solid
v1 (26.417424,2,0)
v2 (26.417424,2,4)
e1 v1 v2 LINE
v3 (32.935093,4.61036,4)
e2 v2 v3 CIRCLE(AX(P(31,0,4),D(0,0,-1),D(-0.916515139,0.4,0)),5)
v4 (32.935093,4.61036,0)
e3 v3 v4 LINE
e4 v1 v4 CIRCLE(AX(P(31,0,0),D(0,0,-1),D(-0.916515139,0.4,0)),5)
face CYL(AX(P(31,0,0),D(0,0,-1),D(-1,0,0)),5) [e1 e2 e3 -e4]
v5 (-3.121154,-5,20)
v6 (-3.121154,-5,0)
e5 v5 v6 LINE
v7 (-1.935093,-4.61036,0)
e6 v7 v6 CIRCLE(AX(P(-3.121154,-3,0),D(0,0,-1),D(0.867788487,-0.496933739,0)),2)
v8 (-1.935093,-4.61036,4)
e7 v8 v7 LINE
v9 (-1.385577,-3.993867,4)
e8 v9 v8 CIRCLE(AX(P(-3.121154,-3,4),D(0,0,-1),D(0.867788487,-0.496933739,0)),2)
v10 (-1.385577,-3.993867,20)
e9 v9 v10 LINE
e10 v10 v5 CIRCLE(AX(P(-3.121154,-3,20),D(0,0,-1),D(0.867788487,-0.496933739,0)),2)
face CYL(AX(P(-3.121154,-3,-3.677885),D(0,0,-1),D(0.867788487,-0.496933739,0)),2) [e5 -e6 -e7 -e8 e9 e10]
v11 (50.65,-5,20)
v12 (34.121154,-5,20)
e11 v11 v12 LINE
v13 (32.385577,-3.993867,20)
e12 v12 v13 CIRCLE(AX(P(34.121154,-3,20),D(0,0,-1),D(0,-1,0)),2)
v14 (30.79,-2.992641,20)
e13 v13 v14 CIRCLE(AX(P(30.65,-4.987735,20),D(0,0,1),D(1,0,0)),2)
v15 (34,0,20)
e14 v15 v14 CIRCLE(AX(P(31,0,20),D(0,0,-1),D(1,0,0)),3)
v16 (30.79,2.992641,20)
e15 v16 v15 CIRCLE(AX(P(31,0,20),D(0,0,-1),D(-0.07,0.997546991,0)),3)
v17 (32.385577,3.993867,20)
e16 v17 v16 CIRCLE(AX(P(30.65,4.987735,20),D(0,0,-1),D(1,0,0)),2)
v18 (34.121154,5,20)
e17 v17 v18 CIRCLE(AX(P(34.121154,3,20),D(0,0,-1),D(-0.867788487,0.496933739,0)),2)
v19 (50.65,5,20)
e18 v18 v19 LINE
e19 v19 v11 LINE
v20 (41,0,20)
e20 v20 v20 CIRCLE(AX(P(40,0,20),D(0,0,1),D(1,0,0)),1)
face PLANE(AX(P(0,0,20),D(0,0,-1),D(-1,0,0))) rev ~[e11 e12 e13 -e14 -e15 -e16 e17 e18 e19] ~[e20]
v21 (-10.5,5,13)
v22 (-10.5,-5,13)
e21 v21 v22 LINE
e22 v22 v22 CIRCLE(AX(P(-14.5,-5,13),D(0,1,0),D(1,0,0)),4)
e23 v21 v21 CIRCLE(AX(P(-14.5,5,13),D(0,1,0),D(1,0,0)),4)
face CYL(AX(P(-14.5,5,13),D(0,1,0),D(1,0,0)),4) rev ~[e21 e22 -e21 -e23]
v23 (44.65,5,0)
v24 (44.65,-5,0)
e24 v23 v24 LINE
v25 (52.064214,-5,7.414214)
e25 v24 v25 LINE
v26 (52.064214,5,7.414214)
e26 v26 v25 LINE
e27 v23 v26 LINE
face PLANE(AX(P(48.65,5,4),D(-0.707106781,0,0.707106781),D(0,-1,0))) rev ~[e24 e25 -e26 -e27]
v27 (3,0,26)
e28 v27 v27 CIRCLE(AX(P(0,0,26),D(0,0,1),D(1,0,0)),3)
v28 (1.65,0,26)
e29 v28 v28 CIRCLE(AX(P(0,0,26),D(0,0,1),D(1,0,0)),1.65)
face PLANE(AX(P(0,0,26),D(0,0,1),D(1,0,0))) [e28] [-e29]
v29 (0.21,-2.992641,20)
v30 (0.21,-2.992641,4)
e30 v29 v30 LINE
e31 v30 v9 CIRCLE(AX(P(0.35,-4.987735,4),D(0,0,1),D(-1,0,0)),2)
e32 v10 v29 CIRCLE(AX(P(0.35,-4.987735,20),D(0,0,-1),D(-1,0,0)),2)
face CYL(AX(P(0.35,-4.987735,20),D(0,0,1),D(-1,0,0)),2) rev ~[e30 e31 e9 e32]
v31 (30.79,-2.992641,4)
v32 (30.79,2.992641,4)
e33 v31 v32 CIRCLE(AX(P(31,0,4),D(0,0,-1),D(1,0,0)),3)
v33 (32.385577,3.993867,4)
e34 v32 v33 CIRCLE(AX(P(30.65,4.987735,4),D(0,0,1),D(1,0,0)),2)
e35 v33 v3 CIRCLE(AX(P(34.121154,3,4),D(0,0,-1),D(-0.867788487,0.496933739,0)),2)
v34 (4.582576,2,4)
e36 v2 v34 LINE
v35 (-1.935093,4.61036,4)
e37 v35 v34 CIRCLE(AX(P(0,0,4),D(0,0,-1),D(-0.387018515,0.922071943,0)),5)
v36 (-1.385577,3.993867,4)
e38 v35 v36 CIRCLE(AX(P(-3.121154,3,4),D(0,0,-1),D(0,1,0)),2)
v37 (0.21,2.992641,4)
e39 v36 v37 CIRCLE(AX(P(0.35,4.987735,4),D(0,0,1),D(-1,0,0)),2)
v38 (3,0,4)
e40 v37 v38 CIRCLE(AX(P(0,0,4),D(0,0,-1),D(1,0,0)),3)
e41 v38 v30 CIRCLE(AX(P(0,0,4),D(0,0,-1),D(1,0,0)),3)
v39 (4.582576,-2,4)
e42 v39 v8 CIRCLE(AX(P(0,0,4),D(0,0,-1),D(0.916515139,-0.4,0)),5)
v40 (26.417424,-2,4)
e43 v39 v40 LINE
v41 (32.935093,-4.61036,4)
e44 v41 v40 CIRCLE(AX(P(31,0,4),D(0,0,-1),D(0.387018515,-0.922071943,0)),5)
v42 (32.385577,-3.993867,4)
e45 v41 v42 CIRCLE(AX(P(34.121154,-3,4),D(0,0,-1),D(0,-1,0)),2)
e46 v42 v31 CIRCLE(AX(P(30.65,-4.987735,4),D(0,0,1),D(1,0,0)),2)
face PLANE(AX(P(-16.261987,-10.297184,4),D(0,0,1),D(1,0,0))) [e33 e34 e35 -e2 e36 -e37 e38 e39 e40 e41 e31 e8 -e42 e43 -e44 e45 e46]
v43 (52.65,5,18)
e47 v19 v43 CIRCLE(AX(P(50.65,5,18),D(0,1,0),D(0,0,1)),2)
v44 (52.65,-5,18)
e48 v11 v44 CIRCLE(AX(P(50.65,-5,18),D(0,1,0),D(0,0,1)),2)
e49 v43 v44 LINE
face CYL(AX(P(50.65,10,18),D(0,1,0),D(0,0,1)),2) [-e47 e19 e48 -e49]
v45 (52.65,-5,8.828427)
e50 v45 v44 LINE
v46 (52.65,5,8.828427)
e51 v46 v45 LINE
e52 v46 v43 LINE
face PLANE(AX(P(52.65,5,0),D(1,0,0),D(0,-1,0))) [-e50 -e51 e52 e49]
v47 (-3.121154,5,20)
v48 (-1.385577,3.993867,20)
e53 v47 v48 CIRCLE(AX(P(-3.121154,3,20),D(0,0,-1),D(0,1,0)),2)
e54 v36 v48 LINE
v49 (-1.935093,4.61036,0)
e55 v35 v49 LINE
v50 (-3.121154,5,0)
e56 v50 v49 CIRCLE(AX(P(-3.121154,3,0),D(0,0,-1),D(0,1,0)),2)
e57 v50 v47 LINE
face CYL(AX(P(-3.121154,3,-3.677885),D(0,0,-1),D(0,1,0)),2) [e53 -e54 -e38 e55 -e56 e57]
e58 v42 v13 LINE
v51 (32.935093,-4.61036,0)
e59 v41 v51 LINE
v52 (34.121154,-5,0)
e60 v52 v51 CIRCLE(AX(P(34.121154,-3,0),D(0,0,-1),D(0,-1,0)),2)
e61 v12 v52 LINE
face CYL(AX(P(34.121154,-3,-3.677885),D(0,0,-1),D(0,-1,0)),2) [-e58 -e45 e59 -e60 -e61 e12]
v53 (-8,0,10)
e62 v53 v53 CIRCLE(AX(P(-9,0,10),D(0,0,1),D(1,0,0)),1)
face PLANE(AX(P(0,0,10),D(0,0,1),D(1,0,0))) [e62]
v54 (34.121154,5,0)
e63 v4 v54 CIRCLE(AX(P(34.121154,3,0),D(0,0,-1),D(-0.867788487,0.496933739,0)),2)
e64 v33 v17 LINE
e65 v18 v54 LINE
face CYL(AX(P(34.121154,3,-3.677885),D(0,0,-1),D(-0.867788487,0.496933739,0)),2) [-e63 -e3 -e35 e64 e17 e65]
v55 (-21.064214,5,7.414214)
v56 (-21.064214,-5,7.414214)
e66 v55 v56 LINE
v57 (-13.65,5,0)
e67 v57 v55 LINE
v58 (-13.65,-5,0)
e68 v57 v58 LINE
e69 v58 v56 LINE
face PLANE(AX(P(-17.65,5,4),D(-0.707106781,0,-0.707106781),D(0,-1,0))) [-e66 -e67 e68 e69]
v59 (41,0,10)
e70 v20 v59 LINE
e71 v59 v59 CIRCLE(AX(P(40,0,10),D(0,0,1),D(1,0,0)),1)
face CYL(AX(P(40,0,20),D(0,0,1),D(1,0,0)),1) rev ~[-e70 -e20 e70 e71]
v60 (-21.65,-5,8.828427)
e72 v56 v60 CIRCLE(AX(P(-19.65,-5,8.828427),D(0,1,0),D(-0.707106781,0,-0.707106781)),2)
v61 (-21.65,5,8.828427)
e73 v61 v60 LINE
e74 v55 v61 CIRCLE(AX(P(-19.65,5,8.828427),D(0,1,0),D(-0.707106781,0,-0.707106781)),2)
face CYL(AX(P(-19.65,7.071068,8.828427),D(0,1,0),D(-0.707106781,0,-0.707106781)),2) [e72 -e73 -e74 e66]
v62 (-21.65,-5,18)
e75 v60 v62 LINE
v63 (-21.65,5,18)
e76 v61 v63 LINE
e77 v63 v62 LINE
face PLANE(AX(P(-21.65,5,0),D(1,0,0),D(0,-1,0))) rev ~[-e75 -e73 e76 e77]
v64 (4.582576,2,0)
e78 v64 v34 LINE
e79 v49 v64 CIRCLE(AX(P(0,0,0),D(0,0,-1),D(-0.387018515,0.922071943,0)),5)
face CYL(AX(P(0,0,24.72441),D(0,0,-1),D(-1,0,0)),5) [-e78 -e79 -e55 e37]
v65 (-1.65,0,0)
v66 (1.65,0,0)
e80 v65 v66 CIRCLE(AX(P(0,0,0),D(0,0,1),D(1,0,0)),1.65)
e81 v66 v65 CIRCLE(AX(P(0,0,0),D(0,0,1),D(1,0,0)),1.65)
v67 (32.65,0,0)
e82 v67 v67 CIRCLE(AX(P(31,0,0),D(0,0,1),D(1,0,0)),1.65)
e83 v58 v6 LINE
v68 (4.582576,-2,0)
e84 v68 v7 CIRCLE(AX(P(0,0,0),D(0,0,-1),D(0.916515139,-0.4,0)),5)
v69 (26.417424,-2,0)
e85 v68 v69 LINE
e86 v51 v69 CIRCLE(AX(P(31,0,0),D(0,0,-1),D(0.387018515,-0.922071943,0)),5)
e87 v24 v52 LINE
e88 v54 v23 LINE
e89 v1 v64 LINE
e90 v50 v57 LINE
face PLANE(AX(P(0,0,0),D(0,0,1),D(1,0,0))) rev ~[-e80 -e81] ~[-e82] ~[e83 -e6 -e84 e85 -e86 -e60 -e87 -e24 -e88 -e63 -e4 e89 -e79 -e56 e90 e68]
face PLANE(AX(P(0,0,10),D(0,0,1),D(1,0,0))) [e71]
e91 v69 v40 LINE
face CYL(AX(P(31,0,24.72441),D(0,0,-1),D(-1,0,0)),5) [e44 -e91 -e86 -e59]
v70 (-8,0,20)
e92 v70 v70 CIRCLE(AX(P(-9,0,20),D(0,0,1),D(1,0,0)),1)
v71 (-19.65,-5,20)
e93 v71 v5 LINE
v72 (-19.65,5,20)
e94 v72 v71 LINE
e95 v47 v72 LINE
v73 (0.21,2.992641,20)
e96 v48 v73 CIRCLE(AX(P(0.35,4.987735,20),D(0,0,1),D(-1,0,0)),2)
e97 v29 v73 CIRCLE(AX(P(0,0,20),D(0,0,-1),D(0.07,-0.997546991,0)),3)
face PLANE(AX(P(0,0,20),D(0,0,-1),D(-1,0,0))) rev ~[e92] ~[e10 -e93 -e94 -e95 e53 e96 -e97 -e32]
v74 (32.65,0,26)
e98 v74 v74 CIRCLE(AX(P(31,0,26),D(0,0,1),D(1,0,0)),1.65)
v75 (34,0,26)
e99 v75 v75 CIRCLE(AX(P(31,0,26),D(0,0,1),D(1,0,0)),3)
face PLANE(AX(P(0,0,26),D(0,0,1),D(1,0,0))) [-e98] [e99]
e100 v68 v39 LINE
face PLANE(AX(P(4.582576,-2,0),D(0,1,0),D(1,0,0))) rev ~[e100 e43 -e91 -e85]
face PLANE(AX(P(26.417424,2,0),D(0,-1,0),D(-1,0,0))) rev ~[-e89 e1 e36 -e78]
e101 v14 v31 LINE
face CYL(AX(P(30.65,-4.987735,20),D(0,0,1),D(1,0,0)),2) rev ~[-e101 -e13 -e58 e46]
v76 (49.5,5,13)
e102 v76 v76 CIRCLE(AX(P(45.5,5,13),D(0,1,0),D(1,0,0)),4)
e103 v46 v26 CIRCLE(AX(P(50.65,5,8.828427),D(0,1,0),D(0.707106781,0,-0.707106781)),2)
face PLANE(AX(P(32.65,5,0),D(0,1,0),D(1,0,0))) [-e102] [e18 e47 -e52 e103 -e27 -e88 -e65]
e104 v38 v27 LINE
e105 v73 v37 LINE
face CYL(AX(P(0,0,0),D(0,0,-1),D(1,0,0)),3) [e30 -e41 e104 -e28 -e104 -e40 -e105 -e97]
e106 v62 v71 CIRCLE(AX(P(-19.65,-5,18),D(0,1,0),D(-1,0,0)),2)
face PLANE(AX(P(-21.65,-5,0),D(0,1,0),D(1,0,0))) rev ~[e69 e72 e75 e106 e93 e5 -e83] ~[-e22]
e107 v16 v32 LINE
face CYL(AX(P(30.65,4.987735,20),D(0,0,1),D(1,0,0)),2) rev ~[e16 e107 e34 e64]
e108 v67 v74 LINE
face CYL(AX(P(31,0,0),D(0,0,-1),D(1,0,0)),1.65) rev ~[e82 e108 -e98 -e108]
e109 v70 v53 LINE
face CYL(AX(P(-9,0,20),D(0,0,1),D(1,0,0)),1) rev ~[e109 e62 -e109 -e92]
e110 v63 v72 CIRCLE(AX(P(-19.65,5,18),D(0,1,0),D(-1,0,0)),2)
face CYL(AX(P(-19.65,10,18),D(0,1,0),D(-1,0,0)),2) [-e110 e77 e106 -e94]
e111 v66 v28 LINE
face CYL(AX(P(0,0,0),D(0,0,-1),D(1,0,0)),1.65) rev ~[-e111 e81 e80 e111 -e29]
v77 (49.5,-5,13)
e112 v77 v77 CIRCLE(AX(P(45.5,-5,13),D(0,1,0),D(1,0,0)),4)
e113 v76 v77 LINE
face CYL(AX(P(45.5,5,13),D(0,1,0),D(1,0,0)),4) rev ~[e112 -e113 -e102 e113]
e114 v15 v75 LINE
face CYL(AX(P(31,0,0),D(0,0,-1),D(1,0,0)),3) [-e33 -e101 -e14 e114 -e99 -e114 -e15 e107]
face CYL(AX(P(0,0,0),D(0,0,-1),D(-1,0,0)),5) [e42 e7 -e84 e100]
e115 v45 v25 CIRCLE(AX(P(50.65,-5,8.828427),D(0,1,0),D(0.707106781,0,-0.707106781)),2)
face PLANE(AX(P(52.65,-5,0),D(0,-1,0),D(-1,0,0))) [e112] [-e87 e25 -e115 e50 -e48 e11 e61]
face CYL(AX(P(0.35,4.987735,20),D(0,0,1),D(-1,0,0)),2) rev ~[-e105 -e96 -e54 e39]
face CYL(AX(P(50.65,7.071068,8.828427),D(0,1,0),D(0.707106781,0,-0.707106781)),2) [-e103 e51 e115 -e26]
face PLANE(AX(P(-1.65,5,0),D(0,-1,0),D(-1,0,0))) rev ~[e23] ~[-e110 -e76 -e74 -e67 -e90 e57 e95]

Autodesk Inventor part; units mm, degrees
ref_plane "YZ Plane" through (0, 0, 0) normal (1, 0, 0) x (0, 1, 0)
ref_plane "XZ Plane" through (0, 0, 0) normal (0, 1, 0) x (-1, 0, 0)
ref_plane "XY Plane" through (0, 0, 0) normal (0, 0, 1) x (1, 0, 0)
sketch "Sketch1" plane through (0, 0, 0) normal (0, 0, 1) x (1, 0, 0)
  circle A0 centre (0, 0) radius 1.65
  circle A1 centre (0, 0) radius 3
  circle A2 centre (31, 0) radius 1.65
  circle A3 centre (31, 0) radius 3
  dimension "d0" = 3.3
  dimension "d1" = 6
  dimension "d22" = 31
extrude "Extrusion1" add sketch "Sketch1" along normal blind 26
sketch "Sketch2" plane through (0, 0, 0) normal (0, 0, -1) x (-1, 0, 0)
  circle A0 centre (0, 0) radius 3 projected
  circle A1 centre (0, 0) radius 5
  circle A2 centre (-31, 0) radius 1.65 projected
  circle A3 centre (-31, 0) radius 5
  circle A4 centre (0, 0) radius 1.65 construction
  line L0 (-29.35, 2) -> (-1.65, 2)
  line L1 (-1.65, 2) -> (-1.65, -2)
  line L2 (-1.65, -2) -> (-29.35, -2)
  line L3 (-29.35, -2) -> (-29.35, 2)
  point P0 (-1.65, 0)
  dimension "d4" = 10
  dimension "d7" = 4
extrude "Extrusion2" add sketch "Sketch2" against normal blind 4 contours A0 L0 A1 L2 | L0 L1 L2 A0 | A0 L2 A1 L0 | A1 L2 A3 L0 | L0 L3 L2 A3 | A3 L2 L3 L0 picked at (-2.1, 0)
sketch "Sketch3" plane through (0, 0, 0) normal (0, 0, -1) x (-1, 0, 0)
  line L0 (-52.65, -5) -> (-32.65, -5)
  line L1 (-32.65, -5) -> (-32.65, 5)
  line L2 (-32.65, 5) -> (-52.65, 5)
  line L3 (-52.65, 5) -> (-52.65, -5)
  line L4 (1.65, 5) -> (21.65, 5)
  line L5 (21.65, 5) -> (21.65, -5)
  line L6 (21.65, -5) -> (1.65, -5)
  line L7 (1.65, -5) -> (1.65, 5)
  circle A0 centre (0, 0) radius 1.65 construction
  circle A1 centre (-31, 0) radius 1.65 construction
  arc A2 (-26.4174, 2) -> (-26.4174, -2) centre (-31, 0) ccw construction
  arc A3 (-4.5826, -2) -> (-4.5826, 2) centre (0, 0) ccw construction
  point P0 (-32.65, 0)
  point P1 (1.65, 0)
  dimension "d8" = 20
  dimension "d10" = 20
extrude "Extrusion3" add sketch "Sketch3" against normal blind 20
sketch "Sketch4" plane through (32.65, 5, 0) normal (0, 1, 0) x (1, 0, 0)
  circle A0 centre (-47.15, -13) radius 4
  circle A1 centre (12.85, -13) radius 4
  line L0 (-34.3, -20) -> (-54.3, -20) projected
  line L1 (20, -20) -> (0, -20) projected
  line L2 (-34.3, 0) -> (-54.3, 0) projected
  line L3 (20, 0) -> (20, -20) projected
  line L4 (-54.3, 0) -> (-54.3, -20) projected
  point P0 (-32.65, 0)
  point P1 (-44.3, -20)
  point P2 (10, -20)
  dimension "d13" = 8
  dimension "d14" = 8
  dimension "d15" = 13
  dimension "d23" = 60
  dimension "d24" = 7.15
  dimension "d25" = 7.15
extrude "Extrusion4" cut sketch "Sketch4" against normal blind 20
chamfer "Chamfer1" distance 8 angle 45 2 edges at (52.65, 0, 0) (-21.65, 0, 0)
fillet "Fillet1" radius 2 12 edges at (32.65, 2.5055, 12) (32.65, -2.5055, 12) (32.65, 5, 10) (-1.65, 2.5055, 12) (-1.65, -2.5055, 12) (-1.65, 5, 10) (-1.65, -5, 10) (32.65, -5, 10) (52.65, 0, 20) (52.65, 0, 8) (-21.65, 0, 8) (-21.65, 0, 20)
sketch "Sketch5" plane through (0, 0, 20) normal (0, 0, 1) x (1, 0, 0)
  line L0 (-19.65, -5) -> (-19.65, 5) projected
  arc A0 (0.21, 2.9926) -> (0.21, -2.9926) centre (0, 0) ccw projected
  circle A1 centre (-9, 0) radius 1
  circle A2 centre (40, 0) radius 1
  arc A3 (30.79, -2.9926) -> (30.79, 2.9926) centre (31, 0) ccw projected
  point P0 (-19.65, 0)
  dimension "d26" = 2
  dimension "d27" = 2
  dimension "d28" = 5
  dimension "d29" = 5
extrude "Extrusion5" cut sketch "Sketch5" against normal blind 10
equation "\"d10\" = d8"
equation "\"d24\" = d25"
equation "\"d29\" = d28"
properties part number "spacer stepperM n rail"
